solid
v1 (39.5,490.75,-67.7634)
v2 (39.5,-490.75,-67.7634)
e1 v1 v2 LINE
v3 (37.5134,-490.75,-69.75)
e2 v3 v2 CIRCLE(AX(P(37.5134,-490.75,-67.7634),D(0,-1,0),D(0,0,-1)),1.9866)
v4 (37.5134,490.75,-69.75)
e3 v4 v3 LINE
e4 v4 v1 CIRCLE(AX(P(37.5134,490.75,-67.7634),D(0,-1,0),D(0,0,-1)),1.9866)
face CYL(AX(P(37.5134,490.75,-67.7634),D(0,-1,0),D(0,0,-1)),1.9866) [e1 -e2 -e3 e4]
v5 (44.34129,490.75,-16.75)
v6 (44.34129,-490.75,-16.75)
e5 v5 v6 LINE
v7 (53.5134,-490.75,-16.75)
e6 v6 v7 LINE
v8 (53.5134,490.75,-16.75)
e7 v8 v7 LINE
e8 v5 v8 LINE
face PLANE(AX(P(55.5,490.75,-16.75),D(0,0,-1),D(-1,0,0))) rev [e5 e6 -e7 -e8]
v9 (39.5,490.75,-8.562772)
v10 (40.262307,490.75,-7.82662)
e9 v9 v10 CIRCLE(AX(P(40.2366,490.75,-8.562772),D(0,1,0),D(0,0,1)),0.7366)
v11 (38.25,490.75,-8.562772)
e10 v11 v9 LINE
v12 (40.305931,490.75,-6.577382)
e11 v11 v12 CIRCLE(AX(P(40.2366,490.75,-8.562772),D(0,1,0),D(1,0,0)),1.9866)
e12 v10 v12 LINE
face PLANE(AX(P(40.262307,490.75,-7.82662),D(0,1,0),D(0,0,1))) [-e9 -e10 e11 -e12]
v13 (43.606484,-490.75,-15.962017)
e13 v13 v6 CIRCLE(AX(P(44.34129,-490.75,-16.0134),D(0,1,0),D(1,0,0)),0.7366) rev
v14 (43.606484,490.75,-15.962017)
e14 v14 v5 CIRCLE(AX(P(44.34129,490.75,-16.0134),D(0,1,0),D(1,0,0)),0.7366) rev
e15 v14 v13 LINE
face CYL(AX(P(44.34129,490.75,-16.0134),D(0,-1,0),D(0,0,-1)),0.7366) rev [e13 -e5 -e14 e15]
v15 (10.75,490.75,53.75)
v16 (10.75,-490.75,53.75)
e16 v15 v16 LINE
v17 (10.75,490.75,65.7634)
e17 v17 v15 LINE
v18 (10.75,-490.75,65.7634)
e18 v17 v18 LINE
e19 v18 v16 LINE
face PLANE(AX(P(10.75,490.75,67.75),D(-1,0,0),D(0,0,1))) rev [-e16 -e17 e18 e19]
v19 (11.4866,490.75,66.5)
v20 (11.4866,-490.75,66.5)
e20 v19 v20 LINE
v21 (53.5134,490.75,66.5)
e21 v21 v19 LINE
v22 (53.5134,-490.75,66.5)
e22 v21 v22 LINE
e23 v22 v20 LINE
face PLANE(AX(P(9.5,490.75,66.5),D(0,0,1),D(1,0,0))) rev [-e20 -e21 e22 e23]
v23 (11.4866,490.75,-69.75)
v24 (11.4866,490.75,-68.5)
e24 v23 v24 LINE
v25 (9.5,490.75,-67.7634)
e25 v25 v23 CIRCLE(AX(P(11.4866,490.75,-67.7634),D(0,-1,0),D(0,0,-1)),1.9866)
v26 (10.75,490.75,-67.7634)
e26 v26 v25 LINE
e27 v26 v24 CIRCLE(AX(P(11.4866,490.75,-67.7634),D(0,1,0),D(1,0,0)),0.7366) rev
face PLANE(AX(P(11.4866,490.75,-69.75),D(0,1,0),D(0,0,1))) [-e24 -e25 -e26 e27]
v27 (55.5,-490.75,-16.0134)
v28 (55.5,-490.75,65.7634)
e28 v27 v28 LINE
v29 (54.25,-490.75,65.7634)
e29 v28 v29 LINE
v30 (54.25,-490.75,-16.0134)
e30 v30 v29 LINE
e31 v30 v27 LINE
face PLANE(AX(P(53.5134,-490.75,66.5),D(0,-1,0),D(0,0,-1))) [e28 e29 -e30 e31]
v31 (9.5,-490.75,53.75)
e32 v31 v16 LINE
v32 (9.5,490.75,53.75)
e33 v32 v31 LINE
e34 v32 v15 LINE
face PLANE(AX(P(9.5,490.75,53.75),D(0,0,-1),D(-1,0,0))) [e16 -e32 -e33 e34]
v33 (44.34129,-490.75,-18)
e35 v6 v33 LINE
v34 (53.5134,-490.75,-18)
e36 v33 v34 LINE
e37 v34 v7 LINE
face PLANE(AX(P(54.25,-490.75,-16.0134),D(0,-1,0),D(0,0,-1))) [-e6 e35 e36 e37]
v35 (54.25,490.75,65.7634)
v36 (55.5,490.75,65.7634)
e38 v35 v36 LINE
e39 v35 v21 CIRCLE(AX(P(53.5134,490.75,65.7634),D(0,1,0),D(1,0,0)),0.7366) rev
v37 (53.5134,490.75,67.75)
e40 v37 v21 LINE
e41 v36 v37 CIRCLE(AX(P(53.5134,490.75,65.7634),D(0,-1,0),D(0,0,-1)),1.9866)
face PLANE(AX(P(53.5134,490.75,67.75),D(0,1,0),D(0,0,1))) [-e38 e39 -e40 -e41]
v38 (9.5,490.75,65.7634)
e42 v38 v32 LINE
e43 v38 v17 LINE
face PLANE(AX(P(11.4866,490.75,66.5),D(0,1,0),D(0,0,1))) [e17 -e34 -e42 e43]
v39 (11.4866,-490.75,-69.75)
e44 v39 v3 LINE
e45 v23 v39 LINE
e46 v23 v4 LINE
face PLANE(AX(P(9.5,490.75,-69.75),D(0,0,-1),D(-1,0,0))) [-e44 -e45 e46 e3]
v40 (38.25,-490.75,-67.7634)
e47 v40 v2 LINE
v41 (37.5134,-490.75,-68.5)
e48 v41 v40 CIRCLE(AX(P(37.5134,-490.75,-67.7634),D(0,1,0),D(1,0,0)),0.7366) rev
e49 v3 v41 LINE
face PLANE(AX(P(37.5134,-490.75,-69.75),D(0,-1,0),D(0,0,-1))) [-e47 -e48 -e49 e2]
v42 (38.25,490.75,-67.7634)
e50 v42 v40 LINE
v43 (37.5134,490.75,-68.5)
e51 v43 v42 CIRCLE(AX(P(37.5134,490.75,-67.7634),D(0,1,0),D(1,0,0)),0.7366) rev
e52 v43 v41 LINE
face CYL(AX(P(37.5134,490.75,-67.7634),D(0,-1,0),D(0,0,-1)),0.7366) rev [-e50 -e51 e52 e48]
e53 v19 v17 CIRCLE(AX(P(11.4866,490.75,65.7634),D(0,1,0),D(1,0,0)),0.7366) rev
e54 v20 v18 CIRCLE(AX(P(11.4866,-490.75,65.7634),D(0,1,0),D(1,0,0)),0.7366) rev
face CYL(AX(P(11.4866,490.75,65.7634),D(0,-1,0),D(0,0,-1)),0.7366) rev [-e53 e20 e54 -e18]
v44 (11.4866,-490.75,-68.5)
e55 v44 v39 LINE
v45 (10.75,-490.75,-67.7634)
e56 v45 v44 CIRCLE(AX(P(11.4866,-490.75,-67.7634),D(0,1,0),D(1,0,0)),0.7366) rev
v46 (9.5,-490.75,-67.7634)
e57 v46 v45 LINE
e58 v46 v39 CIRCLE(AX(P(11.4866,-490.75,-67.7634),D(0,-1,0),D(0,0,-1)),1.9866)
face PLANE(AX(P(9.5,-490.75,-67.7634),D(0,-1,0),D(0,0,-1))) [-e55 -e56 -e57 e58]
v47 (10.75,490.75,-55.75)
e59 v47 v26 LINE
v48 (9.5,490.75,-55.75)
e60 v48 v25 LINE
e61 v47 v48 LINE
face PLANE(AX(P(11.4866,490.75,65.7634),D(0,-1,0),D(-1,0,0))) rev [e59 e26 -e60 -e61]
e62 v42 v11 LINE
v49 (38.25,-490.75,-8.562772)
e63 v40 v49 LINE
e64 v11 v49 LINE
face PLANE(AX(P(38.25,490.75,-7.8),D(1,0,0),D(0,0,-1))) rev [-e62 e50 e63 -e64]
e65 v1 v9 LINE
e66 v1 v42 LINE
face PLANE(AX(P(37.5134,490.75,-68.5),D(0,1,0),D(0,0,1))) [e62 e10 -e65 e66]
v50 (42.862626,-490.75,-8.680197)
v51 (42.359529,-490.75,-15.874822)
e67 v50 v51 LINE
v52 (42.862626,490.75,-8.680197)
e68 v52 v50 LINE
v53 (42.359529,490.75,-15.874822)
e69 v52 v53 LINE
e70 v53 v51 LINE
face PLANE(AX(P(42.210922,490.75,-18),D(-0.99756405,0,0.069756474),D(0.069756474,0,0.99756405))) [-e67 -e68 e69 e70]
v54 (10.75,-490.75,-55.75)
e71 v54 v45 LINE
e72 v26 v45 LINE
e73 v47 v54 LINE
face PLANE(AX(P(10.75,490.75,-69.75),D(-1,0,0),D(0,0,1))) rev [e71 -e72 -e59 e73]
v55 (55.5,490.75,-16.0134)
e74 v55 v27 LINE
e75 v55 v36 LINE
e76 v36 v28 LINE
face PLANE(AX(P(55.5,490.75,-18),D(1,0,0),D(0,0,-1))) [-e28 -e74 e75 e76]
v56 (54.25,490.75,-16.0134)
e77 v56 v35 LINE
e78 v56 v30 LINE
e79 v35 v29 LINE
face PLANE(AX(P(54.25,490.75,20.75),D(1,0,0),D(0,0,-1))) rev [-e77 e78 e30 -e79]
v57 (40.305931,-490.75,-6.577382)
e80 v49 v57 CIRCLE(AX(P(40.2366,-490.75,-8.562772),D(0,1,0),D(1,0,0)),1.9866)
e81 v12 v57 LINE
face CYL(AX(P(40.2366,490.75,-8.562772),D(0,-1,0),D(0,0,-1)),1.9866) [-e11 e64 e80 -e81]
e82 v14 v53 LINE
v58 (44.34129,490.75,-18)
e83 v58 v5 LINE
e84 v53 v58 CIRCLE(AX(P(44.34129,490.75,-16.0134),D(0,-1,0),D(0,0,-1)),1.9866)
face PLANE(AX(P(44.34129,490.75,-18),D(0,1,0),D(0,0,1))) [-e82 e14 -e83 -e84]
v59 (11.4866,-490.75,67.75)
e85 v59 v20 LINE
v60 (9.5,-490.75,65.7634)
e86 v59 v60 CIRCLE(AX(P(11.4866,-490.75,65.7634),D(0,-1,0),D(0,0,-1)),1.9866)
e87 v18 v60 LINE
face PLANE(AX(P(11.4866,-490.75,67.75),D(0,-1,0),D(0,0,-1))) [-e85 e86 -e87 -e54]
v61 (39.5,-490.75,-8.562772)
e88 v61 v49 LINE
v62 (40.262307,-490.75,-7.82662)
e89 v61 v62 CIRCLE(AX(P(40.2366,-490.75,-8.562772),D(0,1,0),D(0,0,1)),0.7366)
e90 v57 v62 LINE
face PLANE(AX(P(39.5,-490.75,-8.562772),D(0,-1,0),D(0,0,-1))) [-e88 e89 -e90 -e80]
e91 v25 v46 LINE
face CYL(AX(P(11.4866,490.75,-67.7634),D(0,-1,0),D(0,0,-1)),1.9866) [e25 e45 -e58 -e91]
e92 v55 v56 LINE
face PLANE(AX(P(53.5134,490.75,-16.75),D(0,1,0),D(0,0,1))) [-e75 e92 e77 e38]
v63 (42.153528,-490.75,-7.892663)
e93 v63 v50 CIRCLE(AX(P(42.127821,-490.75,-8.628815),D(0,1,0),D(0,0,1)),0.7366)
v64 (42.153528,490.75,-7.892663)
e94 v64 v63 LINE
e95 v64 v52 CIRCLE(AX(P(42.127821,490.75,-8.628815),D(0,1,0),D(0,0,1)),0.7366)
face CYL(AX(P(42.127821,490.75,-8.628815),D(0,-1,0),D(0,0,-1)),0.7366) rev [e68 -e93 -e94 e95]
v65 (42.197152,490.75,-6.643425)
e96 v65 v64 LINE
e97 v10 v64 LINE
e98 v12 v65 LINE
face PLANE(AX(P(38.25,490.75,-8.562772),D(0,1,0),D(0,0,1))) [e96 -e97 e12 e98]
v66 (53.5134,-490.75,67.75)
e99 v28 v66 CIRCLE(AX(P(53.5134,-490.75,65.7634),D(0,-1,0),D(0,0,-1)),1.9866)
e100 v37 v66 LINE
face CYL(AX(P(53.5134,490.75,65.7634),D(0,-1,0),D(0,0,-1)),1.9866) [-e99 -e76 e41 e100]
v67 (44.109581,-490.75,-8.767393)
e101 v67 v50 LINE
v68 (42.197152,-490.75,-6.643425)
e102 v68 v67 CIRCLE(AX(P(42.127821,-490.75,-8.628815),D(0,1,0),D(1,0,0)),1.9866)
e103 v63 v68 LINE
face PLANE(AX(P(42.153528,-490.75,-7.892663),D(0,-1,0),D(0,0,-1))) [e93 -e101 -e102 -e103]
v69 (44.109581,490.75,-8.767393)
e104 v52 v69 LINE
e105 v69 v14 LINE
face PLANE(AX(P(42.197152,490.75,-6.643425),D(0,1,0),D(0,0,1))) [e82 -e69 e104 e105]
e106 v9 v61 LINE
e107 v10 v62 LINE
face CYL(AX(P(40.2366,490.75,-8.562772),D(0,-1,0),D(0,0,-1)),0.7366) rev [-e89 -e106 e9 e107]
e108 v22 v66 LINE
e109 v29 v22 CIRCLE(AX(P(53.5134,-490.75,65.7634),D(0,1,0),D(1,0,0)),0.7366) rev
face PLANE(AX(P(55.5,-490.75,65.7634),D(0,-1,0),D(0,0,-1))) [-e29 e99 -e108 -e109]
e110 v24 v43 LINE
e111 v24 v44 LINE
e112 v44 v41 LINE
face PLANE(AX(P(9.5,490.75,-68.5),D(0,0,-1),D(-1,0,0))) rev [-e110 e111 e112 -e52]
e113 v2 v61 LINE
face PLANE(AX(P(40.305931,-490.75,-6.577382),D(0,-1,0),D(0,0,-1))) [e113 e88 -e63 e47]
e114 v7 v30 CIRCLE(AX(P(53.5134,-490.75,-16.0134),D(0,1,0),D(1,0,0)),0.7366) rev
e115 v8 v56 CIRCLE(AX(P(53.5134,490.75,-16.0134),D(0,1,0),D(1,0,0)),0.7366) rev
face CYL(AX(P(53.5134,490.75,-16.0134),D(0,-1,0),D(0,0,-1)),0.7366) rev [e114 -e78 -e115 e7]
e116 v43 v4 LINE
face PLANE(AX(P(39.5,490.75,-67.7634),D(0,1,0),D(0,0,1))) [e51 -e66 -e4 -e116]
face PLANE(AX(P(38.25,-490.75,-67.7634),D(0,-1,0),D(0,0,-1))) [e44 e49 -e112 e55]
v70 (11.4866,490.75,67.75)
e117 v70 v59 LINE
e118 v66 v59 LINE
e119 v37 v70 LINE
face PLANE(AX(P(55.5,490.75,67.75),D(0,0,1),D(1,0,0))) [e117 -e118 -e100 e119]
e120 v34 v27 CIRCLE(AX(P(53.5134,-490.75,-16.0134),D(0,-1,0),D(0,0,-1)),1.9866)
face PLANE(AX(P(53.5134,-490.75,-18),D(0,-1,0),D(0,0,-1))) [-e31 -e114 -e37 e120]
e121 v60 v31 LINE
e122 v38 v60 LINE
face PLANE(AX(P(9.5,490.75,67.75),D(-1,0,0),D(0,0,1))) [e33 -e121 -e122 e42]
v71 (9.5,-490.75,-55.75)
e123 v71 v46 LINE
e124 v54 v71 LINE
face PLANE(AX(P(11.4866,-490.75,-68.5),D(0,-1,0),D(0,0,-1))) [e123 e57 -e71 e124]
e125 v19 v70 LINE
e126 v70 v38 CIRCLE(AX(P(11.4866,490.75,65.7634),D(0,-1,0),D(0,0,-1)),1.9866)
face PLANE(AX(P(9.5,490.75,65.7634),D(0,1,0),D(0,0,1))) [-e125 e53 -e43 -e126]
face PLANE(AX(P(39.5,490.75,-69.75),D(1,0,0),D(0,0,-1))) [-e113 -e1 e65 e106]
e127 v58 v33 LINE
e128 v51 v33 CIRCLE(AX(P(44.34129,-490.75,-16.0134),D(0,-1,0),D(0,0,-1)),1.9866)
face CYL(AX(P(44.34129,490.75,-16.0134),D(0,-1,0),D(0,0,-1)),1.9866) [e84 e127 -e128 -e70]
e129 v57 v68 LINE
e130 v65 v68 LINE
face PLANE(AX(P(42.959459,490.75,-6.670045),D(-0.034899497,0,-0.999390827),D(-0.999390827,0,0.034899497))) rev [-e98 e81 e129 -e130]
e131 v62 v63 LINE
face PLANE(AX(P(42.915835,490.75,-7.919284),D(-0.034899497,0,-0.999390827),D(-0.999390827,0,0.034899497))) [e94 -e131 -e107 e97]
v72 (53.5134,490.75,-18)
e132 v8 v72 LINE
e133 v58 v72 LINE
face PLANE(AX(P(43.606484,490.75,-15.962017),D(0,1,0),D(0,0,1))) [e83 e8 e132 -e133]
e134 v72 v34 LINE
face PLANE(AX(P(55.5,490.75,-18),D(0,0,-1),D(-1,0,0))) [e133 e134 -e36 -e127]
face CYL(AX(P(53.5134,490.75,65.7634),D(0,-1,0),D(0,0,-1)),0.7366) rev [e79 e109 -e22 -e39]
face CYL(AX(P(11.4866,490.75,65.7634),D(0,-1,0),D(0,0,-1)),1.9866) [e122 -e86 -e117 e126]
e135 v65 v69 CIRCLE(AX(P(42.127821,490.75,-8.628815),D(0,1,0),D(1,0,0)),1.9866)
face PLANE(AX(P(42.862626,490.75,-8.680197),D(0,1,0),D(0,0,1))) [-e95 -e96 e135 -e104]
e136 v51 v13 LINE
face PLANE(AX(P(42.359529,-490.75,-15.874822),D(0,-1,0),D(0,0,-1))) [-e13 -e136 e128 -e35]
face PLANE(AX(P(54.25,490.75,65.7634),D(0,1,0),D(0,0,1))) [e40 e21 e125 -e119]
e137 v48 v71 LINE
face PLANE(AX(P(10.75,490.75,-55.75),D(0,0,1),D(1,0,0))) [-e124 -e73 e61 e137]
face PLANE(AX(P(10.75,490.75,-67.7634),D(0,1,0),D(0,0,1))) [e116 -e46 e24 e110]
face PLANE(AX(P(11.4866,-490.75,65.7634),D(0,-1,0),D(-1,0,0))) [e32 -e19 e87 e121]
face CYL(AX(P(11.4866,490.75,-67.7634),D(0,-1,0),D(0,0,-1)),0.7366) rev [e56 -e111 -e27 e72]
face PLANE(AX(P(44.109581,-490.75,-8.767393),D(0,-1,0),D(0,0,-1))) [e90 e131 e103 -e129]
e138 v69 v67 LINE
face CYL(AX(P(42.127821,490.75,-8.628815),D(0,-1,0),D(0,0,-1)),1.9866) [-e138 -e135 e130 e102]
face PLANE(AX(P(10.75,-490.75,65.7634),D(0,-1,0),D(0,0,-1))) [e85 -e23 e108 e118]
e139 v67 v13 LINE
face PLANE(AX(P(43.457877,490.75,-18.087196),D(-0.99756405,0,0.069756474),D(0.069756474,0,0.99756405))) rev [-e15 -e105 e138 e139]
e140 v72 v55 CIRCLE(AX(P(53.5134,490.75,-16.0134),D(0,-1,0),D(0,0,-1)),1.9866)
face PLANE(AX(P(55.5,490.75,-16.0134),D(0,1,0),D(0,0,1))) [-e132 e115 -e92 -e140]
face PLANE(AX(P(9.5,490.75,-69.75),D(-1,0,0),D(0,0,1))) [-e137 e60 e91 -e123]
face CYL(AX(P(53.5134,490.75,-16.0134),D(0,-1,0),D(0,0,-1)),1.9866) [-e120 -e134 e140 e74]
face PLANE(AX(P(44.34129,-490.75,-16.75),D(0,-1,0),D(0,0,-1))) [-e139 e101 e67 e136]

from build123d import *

# Parameters (mm, degrees)
BASE_FLANGE1_DEPTH = 490.75


# Sheet-metal steps are written as plain solids
with BuildPart() as part:
    # Sketch1 → Base-Flange1 (new, symmetric)
    with BuildSketch(Plane(origin=(0, 0, 0), x_dir=(1, 0, 0), z_dir=(0, 1, 0))):
        with BuildLine():
            Line((9.5, 55.75), (9.5, 67.7634))
            ThreePointArc((9.5, 67.7634), (10.081861668, 69.168138332), (11.4866, 69.75))
            Line((11.4866, 69.75), (37.5134, 69.75))
            ThreePointArc((37.5134, 69.75), (38.918138332, 69.168138332), (39.5, 67.7634))
            Line((39.5, 67.7634), (39.5, 18.25))
            Line((39.5, 18.25), (39.5, 8.562771629))
            ThreePointArc((39.5, 8.562771629), (39.724914644, 8.032905932), (40.262306969, 7.826620346))
            Line((40.262306969, 7.826620346), (42.153527557, 7.892663224))
            ThreePointArc((42.153527557, 7.892663224), (42.675221066, 8.135932903), (42.862626267, 8.680197126))
            Line((42.862626267, 8.680197126), (42.359529101, 15.874821789))
            ThreePointArc((42.359529101, 15.874821789), (42.88838258, 17.368257942), (44.341289843, 18))
            Line((44.341289843, 18), (53.5134, 18))
            ThreePointArc((53.5134, 18), (54.918138332, 17.418138332), (55.5, 16.0134))
            Line((55.5, 16.0134), (55.5, -20.75))
            Line((55.5, -20.75), (55.5, -65.7634))
            ThreePointArc((55.5, -65.7634), (54.918138332, -67.168138332), (53.5134, -67.75))
            Line((53.5134, -67.75), (39.5, -67.75))
            Line((39.5, -67.75), (11.4866, -67.75))
            ThreePointArc((11.4866, -67.75), (10.081861668, -67.168138332), (9.5, -65.7634))
            Line((9.5, -65.7634), (9.5, -53.75))
            Line((9.5, -53.75), (10.75, -53.75))
            Line((10.75, -53.75), (10.75, -65.7634))
            ThreePointArc((10.75, -65.7634), (10.965745145, -66.284254855), (11.4866, -66.5))
            Line((11.4866, -66.5), (39.5, -66.5))
            Line((39.5, -66.5), (53.5134, -66.5))
            ThreePointArc((53.5134, -66.5), (54.034254855, -66.284254855), (54.25, -65.7634))
            Line((54.25, -65.7634), (54.25, -20.75))
            Line((54.25, -20.75), (54.25, 16.0134))
            ThreePointArc((54.25, 16.0134), (54.034254855, 16.534254855), (53.5134, 16.75))
            Line((53.5134, 16.75), (44.341289843, 16.75))
            ThreePointArc((44.341289843, 16.75), (43.802574707, 16.515759992), (43.606484164, 15.962017381))
            Line((43.606484164, 15.962017381), (44.10958133, 8.767392718))
            ThreePointArc((44.10958133, 8.767392718), (43.604152098, 7.299519645), (42.197151928, 6.64342469))
            Line((42.197151928, 6.64342469), (40.30593134, 6.577381812))
            ThreePointArc((40.30593134, 6.577381812), (38.856591681, 7.133731182), (38.25, 8.562771629))
            Line((38.25, 8.562771629), (38.25, 18.25))
            Line((38.25, 18.25), (38.25, 67.7634))
            ThreePointArc((38.25, 67.7634), (38.034254855, 68.284254855), (37.5134, 68.5))
            Line((37.5134, 68.5), (11.4866, 68.5))
            ThreePointArc((11.4866, 68.5), (10.965745145, 68.284254855), (10.75, 67.7634))
            Line((10.75, 67.7634), (10.75, 55.75))
            Line((10.75, 55.75), (9.5, 55.75))
        make_face()
    extrude(amount=BASE_FLANGE1_DEPTH, both=True)


solid = part.part
